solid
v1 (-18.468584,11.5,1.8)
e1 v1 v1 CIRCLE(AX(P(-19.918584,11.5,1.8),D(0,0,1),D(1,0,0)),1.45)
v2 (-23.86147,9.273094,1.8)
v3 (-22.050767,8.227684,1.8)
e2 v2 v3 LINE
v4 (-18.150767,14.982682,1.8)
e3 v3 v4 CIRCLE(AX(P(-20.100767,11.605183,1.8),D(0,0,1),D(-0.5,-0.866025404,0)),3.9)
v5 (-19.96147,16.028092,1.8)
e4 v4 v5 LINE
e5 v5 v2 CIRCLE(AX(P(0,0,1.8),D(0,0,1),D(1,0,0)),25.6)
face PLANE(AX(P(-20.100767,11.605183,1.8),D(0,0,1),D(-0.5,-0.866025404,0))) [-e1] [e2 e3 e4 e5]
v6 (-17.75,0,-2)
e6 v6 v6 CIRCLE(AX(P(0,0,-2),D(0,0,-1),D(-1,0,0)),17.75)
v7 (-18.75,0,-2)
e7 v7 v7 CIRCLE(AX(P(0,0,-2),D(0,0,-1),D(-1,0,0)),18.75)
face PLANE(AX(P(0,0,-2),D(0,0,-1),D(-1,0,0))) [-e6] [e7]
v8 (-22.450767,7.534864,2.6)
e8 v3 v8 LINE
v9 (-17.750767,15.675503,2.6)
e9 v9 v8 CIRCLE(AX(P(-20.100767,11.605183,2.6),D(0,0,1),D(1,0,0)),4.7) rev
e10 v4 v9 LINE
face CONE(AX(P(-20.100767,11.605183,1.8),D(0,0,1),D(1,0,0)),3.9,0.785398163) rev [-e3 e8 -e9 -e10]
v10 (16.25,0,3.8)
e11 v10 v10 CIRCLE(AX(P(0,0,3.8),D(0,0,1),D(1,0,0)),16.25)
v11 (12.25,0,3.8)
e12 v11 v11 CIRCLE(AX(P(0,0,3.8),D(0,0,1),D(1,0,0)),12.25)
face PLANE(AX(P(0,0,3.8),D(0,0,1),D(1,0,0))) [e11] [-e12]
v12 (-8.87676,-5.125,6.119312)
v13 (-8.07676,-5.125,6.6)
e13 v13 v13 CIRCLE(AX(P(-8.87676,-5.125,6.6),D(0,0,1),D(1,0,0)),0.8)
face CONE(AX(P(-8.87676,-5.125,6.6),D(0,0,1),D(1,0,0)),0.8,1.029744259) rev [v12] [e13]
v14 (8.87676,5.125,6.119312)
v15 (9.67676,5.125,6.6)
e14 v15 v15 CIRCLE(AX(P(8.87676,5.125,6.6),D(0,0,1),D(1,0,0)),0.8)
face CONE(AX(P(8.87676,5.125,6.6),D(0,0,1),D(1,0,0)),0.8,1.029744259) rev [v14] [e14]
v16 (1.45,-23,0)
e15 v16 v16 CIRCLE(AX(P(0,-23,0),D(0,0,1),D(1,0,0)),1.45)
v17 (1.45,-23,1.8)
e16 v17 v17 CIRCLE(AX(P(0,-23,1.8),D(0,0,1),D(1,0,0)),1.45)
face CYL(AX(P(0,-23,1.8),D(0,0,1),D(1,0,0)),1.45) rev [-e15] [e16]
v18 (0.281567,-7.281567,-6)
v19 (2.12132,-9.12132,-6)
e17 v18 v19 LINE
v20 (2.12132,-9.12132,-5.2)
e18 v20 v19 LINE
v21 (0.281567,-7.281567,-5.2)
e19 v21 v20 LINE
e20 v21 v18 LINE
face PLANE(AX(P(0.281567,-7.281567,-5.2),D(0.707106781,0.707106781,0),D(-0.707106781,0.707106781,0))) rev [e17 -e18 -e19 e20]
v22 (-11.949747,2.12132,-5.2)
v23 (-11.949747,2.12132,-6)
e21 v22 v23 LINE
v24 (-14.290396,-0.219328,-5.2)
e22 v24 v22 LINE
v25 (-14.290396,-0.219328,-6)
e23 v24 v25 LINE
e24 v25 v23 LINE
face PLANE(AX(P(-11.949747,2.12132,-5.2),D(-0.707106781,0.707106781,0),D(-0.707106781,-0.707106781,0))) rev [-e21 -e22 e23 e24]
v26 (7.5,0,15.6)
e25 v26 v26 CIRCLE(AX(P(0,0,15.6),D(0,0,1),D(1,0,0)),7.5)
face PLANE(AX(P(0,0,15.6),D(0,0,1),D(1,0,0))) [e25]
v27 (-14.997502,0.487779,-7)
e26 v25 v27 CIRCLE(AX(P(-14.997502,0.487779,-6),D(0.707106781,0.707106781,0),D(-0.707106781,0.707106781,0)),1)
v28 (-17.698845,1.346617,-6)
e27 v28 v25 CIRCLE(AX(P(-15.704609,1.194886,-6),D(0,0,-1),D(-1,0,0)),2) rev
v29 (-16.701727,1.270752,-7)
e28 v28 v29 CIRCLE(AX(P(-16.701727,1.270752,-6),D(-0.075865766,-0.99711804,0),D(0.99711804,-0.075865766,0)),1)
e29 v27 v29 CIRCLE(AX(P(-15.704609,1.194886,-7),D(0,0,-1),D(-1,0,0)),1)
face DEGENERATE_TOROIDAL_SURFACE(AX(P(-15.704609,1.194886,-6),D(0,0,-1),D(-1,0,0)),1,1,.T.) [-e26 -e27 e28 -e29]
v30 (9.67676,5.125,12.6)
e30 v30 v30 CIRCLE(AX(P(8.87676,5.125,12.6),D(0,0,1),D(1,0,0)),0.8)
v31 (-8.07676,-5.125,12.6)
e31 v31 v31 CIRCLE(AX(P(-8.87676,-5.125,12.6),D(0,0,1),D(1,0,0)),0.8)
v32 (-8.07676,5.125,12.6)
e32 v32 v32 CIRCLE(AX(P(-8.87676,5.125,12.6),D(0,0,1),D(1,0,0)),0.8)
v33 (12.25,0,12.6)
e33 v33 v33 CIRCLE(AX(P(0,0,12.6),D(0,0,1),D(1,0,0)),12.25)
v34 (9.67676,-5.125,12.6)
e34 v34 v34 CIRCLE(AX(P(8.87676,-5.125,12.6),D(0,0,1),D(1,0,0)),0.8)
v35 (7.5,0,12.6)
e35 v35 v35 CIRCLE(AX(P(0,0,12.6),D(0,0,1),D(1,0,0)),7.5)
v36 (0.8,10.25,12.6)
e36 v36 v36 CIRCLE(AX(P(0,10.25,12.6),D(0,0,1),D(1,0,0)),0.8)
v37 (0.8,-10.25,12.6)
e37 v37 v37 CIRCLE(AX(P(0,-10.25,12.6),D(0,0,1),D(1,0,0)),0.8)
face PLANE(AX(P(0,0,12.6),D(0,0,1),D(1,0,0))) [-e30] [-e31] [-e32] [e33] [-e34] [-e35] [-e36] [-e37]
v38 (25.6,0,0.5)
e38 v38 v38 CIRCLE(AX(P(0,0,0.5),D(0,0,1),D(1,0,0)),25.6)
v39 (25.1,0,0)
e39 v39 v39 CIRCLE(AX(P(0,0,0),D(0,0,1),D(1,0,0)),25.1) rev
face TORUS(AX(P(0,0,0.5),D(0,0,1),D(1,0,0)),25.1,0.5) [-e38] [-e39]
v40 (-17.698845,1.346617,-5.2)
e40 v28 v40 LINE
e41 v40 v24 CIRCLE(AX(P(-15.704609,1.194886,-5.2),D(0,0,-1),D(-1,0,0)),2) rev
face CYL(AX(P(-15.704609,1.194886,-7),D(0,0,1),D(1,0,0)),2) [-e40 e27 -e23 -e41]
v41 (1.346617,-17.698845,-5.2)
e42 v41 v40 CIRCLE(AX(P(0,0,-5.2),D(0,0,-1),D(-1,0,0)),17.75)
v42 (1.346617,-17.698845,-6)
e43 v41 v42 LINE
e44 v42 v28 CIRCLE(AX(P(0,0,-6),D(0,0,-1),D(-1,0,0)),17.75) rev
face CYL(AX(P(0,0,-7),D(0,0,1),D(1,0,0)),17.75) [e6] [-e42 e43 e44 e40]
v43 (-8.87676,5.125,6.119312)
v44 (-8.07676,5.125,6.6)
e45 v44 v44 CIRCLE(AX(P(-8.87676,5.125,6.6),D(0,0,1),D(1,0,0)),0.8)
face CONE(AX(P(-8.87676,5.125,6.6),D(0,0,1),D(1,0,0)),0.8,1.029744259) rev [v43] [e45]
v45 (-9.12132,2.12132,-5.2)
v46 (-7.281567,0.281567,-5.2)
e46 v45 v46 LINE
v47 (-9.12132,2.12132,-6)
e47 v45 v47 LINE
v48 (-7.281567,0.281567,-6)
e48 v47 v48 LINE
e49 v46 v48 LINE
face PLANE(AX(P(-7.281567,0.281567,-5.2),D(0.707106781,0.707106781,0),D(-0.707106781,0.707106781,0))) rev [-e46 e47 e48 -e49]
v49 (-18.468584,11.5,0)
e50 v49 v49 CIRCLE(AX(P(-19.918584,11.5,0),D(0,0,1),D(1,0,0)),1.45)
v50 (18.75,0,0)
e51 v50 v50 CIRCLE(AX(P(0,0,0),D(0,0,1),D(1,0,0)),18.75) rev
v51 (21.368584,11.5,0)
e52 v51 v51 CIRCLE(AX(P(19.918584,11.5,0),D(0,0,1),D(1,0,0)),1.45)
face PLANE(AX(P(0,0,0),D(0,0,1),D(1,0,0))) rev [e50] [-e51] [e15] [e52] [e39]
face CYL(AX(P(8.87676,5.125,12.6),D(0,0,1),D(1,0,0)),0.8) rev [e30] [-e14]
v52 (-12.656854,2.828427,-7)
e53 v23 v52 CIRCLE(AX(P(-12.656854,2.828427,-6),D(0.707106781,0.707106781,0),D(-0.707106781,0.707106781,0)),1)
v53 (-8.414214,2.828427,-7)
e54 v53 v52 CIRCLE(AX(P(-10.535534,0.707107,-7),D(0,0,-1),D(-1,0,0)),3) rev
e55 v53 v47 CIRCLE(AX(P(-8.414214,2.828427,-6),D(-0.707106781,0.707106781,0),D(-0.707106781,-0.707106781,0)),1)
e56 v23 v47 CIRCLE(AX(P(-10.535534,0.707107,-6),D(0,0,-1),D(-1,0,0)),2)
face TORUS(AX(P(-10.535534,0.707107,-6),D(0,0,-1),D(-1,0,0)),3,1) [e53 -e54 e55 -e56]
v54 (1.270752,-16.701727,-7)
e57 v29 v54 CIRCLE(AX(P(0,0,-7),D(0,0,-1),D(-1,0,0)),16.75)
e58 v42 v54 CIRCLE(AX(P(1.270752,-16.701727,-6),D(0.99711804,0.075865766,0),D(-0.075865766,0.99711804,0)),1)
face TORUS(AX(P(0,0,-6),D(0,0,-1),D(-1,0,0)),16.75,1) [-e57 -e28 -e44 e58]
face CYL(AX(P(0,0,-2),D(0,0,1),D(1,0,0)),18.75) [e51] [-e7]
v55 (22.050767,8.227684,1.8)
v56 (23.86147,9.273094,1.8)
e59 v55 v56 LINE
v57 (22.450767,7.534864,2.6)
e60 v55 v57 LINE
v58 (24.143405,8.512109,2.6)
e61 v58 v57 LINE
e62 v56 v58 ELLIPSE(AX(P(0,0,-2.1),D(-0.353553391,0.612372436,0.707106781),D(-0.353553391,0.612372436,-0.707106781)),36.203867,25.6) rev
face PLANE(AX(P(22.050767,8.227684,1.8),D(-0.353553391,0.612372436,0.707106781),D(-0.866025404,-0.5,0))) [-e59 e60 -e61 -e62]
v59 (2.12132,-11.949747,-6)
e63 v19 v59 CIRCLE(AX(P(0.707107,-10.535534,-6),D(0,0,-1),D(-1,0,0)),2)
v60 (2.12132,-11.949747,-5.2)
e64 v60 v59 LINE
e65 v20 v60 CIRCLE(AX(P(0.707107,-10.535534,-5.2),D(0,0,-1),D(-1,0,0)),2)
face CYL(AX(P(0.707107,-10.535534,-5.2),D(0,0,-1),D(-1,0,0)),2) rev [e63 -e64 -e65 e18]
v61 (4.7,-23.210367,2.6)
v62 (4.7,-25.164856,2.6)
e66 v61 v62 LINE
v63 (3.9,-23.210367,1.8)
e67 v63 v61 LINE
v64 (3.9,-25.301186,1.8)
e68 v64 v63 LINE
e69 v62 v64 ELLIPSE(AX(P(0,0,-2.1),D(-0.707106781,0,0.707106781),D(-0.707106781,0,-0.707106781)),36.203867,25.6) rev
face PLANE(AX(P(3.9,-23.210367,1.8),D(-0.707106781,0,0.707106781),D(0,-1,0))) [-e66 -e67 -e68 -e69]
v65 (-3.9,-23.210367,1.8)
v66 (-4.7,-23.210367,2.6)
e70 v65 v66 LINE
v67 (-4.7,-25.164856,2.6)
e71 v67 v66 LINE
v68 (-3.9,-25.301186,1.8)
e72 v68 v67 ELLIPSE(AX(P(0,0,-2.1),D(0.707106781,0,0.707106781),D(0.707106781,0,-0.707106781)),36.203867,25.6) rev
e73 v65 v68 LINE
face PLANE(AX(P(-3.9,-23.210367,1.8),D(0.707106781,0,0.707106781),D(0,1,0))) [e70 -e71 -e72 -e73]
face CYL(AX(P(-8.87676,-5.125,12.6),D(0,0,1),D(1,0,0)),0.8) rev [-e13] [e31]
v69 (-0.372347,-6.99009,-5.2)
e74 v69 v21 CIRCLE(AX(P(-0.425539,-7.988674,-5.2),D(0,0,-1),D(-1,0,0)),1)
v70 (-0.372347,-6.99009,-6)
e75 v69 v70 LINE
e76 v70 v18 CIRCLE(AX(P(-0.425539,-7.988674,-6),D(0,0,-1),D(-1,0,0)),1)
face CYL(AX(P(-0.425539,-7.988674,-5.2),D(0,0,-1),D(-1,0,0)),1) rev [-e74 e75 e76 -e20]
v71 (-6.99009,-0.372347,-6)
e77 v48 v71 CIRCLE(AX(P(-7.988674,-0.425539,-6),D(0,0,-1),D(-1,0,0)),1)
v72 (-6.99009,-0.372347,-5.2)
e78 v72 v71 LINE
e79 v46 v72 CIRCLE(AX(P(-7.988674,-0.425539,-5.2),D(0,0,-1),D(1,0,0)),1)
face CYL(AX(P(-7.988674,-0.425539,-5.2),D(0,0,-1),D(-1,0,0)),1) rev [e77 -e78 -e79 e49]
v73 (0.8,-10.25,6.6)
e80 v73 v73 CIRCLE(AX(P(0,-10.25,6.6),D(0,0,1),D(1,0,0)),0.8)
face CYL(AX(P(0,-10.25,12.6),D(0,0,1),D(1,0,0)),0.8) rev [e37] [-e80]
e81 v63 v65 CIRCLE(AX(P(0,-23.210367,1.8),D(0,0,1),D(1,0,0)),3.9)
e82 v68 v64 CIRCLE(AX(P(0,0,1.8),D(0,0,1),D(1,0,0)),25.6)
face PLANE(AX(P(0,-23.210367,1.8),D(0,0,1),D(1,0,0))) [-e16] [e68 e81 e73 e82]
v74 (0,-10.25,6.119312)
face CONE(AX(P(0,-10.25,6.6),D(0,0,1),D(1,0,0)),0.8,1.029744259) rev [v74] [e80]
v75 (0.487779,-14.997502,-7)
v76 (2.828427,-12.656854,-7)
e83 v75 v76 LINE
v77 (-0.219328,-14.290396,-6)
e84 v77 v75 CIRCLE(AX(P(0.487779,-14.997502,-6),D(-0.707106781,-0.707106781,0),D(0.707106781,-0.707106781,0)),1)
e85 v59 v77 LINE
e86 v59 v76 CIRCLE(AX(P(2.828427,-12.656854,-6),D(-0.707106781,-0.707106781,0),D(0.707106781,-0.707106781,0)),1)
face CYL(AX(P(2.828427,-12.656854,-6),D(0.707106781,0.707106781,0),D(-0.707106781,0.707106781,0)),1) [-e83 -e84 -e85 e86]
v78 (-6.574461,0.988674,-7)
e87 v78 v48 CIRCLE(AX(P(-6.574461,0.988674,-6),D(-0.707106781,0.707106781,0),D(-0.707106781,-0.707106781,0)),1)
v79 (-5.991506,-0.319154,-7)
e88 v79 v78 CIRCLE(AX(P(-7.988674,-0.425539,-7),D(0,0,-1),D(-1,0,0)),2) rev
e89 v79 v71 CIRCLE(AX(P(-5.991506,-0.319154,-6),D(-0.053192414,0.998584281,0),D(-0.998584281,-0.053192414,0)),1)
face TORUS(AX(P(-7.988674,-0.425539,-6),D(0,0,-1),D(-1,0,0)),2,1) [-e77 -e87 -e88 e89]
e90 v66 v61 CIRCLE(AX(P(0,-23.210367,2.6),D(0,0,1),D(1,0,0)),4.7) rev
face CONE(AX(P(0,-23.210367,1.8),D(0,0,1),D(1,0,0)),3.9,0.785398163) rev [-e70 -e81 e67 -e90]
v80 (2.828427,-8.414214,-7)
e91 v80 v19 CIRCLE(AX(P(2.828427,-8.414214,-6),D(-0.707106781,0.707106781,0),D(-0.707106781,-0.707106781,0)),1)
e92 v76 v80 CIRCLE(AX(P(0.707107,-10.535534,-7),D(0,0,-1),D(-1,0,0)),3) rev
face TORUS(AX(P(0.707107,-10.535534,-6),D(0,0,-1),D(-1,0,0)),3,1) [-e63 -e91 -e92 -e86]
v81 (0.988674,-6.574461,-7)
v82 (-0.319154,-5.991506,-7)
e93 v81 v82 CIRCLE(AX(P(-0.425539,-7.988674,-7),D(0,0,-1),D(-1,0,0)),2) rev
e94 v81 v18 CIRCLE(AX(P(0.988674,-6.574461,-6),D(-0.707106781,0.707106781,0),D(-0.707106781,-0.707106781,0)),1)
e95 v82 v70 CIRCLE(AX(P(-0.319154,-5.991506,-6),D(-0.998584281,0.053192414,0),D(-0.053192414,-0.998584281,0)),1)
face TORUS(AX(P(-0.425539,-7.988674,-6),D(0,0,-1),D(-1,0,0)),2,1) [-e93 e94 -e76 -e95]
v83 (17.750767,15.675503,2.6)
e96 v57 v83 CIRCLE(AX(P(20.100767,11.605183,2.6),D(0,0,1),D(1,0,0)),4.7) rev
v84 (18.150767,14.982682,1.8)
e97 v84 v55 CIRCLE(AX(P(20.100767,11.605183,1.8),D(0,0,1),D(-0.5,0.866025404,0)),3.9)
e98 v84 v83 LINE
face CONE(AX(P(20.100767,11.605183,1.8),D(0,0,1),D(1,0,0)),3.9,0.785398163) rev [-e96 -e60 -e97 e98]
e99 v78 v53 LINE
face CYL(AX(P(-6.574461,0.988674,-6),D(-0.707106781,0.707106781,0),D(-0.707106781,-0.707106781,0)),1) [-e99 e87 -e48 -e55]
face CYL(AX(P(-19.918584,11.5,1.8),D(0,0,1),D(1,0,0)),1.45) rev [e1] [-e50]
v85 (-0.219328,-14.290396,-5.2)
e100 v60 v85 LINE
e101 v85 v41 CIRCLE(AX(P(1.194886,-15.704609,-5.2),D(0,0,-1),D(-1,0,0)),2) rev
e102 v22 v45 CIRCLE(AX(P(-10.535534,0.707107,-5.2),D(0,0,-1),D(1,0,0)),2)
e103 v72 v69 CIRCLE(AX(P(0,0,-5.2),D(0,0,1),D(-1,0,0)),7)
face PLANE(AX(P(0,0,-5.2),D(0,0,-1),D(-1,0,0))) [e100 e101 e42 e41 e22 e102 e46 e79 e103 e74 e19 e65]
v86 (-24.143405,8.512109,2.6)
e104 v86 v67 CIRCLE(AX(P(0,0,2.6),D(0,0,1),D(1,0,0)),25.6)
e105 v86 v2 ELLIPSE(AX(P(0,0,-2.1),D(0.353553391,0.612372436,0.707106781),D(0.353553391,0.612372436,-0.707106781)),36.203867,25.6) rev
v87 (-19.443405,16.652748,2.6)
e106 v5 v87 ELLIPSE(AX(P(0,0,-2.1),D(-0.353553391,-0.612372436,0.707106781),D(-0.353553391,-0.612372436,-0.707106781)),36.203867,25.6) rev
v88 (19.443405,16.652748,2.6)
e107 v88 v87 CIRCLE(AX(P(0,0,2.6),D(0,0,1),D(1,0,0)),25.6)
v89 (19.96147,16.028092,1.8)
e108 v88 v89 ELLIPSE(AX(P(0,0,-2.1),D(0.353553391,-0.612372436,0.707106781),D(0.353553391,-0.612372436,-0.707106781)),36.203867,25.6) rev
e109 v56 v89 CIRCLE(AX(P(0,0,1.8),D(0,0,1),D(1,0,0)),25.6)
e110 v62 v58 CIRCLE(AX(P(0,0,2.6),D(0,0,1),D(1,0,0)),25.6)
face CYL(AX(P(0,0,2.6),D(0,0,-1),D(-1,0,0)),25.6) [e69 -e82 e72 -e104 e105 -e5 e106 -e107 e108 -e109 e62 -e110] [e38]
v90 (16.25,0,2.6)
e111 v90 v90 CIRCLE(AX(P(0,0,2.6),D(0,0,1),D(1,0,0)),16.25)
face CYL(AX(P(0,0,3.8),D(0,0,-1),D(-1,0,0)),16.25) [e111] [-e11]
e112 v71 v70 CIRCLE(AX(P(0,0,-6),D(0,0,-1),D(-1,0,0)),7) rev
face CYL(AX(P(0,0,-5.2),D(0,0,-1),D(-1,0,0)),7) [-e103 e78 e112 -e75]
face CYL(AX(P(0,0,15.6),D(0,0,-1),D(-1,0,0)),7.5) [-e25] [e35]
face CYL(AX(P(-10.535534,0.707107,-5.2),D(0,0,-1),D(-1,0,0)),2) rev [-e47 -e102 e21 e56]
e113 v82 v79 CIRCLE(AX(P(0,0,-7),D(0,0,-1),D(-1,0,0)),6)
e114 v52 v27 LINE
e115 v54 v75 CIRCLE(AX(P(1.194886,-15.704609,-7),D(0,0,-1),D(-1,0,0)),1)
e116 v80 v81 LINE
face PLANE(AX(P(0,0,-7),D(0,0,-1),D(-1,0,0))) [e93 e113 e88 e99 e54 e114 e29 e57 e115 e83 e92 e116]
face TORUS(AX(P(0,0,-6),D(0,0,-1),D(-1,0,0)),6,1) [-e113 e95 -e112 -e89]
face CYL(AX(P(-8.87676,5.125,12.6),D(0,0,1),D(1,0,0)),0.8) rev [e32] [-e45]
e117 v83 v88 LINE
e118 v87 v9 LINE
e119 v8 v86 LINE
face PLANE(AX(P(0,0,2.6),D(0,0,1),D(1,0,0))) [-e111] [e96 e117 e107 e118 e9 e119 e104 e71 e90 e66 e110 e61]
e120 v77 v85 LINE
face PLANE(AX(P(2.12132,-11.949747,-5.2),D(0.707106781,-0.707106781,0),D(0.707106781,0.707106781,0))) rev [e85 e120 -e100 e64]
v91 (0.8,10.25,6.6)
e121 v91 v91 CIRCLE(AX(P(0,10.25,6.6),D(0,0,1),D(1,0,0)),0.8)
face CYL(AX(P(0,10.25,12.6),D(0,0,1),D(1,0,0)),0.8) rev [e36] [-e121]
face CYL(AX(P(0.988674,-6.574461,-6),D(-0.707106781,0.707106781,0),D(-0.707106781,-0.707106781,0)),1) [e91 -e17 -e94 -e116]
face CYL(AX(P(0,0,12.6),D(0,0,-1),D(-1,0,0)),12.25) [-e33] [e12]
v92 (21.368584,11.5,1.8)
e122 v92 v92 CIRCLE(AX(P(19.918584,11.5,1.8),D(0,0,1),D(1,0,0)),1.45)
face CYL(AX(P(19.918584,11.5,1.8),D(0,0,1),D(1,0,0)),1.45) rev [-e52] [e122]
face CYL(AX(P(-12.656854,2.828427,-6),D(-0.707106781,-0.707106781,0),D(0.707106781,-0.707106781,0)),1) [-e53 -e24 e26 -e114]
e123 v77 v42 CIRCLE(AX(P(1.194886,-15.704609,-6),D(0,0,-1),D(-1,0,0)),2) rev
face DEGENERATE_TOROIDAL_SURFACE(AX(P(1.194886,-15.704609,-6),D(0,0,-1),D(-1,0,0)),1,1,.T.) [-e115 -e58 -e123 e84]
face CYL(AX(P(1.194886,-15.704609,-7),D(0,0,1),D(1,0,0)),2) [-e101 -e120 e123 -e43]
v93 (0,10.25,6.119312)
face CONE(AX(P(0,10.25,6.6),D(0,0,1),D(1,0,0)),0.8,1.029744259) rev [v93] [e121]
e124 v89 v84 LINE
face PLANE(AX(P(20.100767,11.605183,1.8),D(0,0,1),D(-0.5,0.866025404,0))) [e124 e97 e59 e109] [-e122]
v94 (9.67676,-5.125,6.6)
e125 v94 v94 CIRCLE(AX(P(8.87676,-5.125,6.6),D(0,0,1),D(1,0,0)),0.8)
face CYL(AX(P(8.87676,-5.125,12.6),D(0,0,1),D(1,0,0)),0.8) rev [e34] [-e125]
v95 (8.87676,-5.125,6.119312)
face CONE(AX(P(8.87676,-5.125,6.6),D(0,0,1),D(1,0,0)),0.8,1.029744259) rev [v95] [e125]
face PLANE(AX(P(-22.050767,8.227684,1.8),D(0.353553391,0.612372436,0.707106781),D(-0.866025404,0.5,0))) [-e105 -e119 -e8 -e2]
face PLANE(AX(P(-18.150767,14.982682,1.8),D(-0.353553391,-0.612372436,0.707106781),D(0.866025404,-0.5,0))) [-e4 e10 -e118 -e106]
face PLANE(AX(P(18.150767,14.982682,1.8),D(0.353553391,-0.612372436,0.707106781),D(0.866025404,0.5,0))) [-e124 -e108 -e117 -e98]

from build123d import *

# Parameters (mm, degrees)
SKETCH4_R                    = 25.6
BOSS_EXTRUDE5_DEPTH          = 2.6
SKETCH5_R                    = 16.25
BOSS_EXTRUDE6_DEPTH          = 1.2
SKETCH6_R                    = 12.25
BOSS_EXTRUDE7_DEPTH          = 8.8
SKETCH7_R                    = 7.5
BOSS_EXTRUDE8_DEPTH          = 3
FILLET2_R                    = 0.5
CUT_EXTRUDE1_DEPTH           = 0.8
CHAMFER2_SIZE                = 0.8
M2_5_CLEARANCE_HOLE1_D       = 2.9
CIRPATTERN1_COUNT            = 3
CHAMFER2_OF_CIRPATTERN1_SIZE = 0.8
CIRPATTERN2_COUNT            = 6
SKETCH13_R                   = 18.75
BOSS_EXTRUDE9_DEPTH          = 2
SKETCH14_R                   = 17.75
BOSS_EXTRUDE10_DEPTH         = 5
CUT_EXTRUDE3_START           = -1.8
CUT_EXTRUDE3_DEPTH           = 1.8
FILLET6_R                    = 2
FILLET8_R                    = 1


# Some blends are built 0.0001 mm under size
with BuildPart() as part:
    # Sketch4 → Boss-Extrude5 (new body)
    with BuildSketch(Plane.XY):
        Circle(SKETCH4_R)
    extrude(amount=BOSS_EXTRUDE5_DEPTH)

    # Sketch5 → Boss-Extrude6 (add)
    with BuildSketch(Plane.XY.offset(2.6)):
        Circle(SKETCH5_R)
    extrude(amount=BOSS_EXTRUDE6_DEPTH)

    # Sketch6 → Boss-Extrude7 (add)
    with BuildSketch(Plane.XY.offset(3.8)):
        Circle(SKETCH6_R)
    extrude(amount=BOSS_EXTRUDE7_DEPTH)

    # Sketch7 → Boss-Extrude8 (add)
    with BuildSketch(Plane.XY.offset(12.6)):
        Circle(SKETCH7_R)
    extrude(amount=BOSS_EXTRUDE8_DEPTH)

    # Fillet2
    fillet2_edges = [part.edges().sort_by_distance(p)[0] for p in [
        (-25.6, 0, 0),
    ]]
    fillet(fillet2_edges, radius=FILLET2_R)

    # Sketch8 → Cut-Extrude1 (cut)
    with BuildSketch(Plane.XY.offset(2.6)):
        with BuildLine():
            Line((3.9, -23.210366581), (3.9, -30.789633419))
            ThreePointArc((3.9, -30.789633419), (0, -34.689633419), (-3.9, -30.789633419))
            Line((-3.9, -30.789633419), (-3.9, -23.210366581))
            ThreePointArc((-3.9, -23.210366581), (0, -19.310366581), (3.9, -23.210366581))
        make_face()
    cut_extrude1 = extrude(amount=-CUT_EXTRUDE1_DEPTH, mode=Mode.SUBTRACT)

    # Chamfer2
    chamfer2_edges = [part.edges().sort_by_distance(p)[0] for p in [
        (-3.9, -24.255776162, 2.6),
        (0, -19.310366581, 2.6),
        (3.9, -24.255776162, 2.6),
    ]]
    chamfer(chamfer2_edges, length=CHAMFER2_SIZE - 0.0001)  # a hair under: the kernel refuses the full size

    # M2.5 Clearance Hole1 (through all)
    with Locations(Plane.XY.offset(1.8)):
        with Locations((0, -23)):
            m2_5_clearance_hole1 = Hole(M2_5_CLEARANCE_HOLE1_D / 2)

    # CirPattern1: Cut-Extrude1, M2.5 Clearance Hole1 ×3 about axis
    cirpattern1_axis = Axis((0, 0, 0), (0, 0, 1))
    add([cut_extrude1.rotate(cirpattern1_axis, i * 360 / CIRPATTERN1_COUNT) for i in range(1, CIRPATTERN1_COUNT)], mode=Mode.SUBTRACT)
    add([m2_5_clearance_hole1.rotate(cirpattern1_axis, i * 360 / CIRPATTERN1_COUNT) for i in range(1, CIRPATTERN1_COUNT)], mode=Mode.SUBTRACT)

    # Chamfer2 of CirPattern1
    chamfer2_of_cirpattern1_edges = [part.edges().sort_by_distance(p)[0] for p in [
        (22.956118345, 8.750389006, 2.6),
        (16.723268015, 9.65518329, 2.6),
        (19.056118345, 15.505387156, 2.6),
        (-19.056118345, 15.505387156, 2.6),
        (-16.723268015, 9.65518329, 2.6),
        (-22.956118345, 8.750389006, 2.6),
    ]]
    chamfer(chamfer2_of_cirpattern1_edges, length=CHAMFER2_OF_CIRPATTERN1_SIZE - 0.0001)  # a hair under: the kernel refuses the full size

    # Sketch12 → Tap Drill for M2x0.4 Tap1 (revolve, cut)
    with BuildSketch(Plane(origin=(0, -10.25, 12.6), x_dir=(0, -1, 0), z_dir=(1, 0, 0))):
        Polygon((0, 0), (0, 6.480688495), (0.8, 6), (0.8, 0), align=None)
    tap_drill_for_m2x0_4_tap1 = revolve(axis=Axis((0, -10.25, 18.95), (0, 0, -1)), mode=Mode.SUBTRACT)

    # CirPattern2: Tap Drill for M2x0.4 Tap1 ×6 about axis
    cirpattern2_axis = Axis((0, 0, 0), (0, 0, 1))
    for i in range(1, CIRPATTERN2_COUNT):
        add(tap_drill_for_m2x0_4_tap1.rotate(cirpattern2_axis, i * 360 / CIRPATTERN2_COUNT), mode=Mode.SUBTRACT)

    # Sketch13 → Boss-Extrude9 (add)
    with BuildSketch(Plane(origin=(0, 0, 0), x_dir=(-1, 0, 0), z_dir=(0, 0, -1))):
        with Locations(Location((0, 0, 0), (0, 0, 180))):
            Circle(SKETCH13_R)
    extrude(amount=BOSS_EXTRUDE9_DEPTH)

    # Sketch14 → Boss-Extrude10 (add)
    with BuildSketch(Plane(origin=(0, 0, -2), x_dir=(-1, 0, 0), z_dir=(0, 0, -1))):
        Circle(SKETCH14_R)
    extrude(amount=BOSS_EXTRUDE10_DEPTH)

    # Sketch17 → Cut-Extrude3 (cut)
    with BuildSketch(Plane(origin=(0, 0, -7), x_dir=(-1, 0, 0), z_dir=(0, 0, -1)).offset(CUT_EXTRUDE3_START)):
        with BuildLine():
            Line((-0.28156747, -7.28156747), (-2.121320344, -9.121320344))
            ThreePointArc((-2.121320344, -9.121320344), (-2.707106781, -10.535533906), (-2.121320344, -11.949747468))
            Line((-2.121320344, -11.949747468), (3.358335088, -17.4294029))
            ThreePointArc((3.358335088, -17.4294029), (12.551145366, -12.551145366), (17.4294029, -3.358335088))
            Line((17.4294029, -3.358335088), (11.949747468, 2.121320344))
            ThreePointArc((11.949747468, 2.121320344), (10.535533906, 2.707106781), (9.121320344, 2.121320344))
            Line((9.121320344, 2.121320344), (7.28156747, 0.28156747))
            ThreePointArc((7.28156747, 0.28156747), (7.075303297, -0.018410953), (6.99008997, -0.372346897))
            ThreePointArc((6.99008997, -0.372346897), (4.949747468, -4.949747468), (0.372346897, -6.99008997))
            ThreePointArc((0.372346897, -6.99008997), (0.018410953, -7.075303297), (-0.28156747, -7.28156747))
        make_face()
    extrude(amount=CUT_EXTRUDE3_DEPTH, mode=Mode.SUBTRACT)

    # Fillet6
    # the kernel refuses this fillet: 2 mm, written as the material it takes off along each edge
    with BuildSketch(Plane(origin=(-17.4294029, -3.358335088, -5.2), x_dir=(-0.05717413002562378, 0.9983642215423252, 0), z_dir=(0, 0, -1))) as fillet6_piece_1:
        with BuildLine():
            CenterArc((4.447159251, 1.982298833), FILLET6_R, 138.277623698, 139.350968751)
            Line((2.954402599, 3.313342625), (0, 0))
            ThreePointArc((0, 0), (2.356330648, -0.157097855), (4.712661296, 0))
        make_face()
    extrude(amount=13.58165324, mode=Mode.SUBTRACT)
    with BuildSketch(Plane(origin=(-3.358335088, -17.4294029, -5.2), x_dir=(0.9983642215423252, -0.057174130025623736, 0), z_dir=(0, 0, -1))) as fillet6_piece_2:
        with BuildLine():
            CenterArc((4.447159251, -1.982298833), FILLET6_R, 82.371407551, 139.350968751)
            Line((2.954402599, -3.313342625), (0, 0))
            ThreePointArc((0, 0), (2.356330648, 0.157097855), (4.712661296, 0))
        make_face()
    extrude(amount=13.58165324, mode=Mode.SUBTRACT)

    # Fillet8
    fillet8_edges = [part.edges().sort_by_distance(p)[0] for p in [
        (-10.535533906, 2.707106781, -7),
        (-8.201443907, 1.201443907, -7),
        (-7.075303297, -0.018410953, -7),
        (-4.949747468, -4.949747468, -7),
        (-0.018410953, -7.075303297, -7),
        (1.201443907, -8.201443907, -7),
        (2.707106781, -10.535533906, -7),
        (0.950996294, -13.120071518, -7),
        (-13.120071518, 0.950996294, -7),
        (12.551145366, 12.551145366, -7),
        (-0.622487974, -16.539565739, -7),
        (-16.539565739, -0.622487974, -7),
    ]]
    fillet(fillet8_edges, radius=FILLET8_R)


solid = part.part
